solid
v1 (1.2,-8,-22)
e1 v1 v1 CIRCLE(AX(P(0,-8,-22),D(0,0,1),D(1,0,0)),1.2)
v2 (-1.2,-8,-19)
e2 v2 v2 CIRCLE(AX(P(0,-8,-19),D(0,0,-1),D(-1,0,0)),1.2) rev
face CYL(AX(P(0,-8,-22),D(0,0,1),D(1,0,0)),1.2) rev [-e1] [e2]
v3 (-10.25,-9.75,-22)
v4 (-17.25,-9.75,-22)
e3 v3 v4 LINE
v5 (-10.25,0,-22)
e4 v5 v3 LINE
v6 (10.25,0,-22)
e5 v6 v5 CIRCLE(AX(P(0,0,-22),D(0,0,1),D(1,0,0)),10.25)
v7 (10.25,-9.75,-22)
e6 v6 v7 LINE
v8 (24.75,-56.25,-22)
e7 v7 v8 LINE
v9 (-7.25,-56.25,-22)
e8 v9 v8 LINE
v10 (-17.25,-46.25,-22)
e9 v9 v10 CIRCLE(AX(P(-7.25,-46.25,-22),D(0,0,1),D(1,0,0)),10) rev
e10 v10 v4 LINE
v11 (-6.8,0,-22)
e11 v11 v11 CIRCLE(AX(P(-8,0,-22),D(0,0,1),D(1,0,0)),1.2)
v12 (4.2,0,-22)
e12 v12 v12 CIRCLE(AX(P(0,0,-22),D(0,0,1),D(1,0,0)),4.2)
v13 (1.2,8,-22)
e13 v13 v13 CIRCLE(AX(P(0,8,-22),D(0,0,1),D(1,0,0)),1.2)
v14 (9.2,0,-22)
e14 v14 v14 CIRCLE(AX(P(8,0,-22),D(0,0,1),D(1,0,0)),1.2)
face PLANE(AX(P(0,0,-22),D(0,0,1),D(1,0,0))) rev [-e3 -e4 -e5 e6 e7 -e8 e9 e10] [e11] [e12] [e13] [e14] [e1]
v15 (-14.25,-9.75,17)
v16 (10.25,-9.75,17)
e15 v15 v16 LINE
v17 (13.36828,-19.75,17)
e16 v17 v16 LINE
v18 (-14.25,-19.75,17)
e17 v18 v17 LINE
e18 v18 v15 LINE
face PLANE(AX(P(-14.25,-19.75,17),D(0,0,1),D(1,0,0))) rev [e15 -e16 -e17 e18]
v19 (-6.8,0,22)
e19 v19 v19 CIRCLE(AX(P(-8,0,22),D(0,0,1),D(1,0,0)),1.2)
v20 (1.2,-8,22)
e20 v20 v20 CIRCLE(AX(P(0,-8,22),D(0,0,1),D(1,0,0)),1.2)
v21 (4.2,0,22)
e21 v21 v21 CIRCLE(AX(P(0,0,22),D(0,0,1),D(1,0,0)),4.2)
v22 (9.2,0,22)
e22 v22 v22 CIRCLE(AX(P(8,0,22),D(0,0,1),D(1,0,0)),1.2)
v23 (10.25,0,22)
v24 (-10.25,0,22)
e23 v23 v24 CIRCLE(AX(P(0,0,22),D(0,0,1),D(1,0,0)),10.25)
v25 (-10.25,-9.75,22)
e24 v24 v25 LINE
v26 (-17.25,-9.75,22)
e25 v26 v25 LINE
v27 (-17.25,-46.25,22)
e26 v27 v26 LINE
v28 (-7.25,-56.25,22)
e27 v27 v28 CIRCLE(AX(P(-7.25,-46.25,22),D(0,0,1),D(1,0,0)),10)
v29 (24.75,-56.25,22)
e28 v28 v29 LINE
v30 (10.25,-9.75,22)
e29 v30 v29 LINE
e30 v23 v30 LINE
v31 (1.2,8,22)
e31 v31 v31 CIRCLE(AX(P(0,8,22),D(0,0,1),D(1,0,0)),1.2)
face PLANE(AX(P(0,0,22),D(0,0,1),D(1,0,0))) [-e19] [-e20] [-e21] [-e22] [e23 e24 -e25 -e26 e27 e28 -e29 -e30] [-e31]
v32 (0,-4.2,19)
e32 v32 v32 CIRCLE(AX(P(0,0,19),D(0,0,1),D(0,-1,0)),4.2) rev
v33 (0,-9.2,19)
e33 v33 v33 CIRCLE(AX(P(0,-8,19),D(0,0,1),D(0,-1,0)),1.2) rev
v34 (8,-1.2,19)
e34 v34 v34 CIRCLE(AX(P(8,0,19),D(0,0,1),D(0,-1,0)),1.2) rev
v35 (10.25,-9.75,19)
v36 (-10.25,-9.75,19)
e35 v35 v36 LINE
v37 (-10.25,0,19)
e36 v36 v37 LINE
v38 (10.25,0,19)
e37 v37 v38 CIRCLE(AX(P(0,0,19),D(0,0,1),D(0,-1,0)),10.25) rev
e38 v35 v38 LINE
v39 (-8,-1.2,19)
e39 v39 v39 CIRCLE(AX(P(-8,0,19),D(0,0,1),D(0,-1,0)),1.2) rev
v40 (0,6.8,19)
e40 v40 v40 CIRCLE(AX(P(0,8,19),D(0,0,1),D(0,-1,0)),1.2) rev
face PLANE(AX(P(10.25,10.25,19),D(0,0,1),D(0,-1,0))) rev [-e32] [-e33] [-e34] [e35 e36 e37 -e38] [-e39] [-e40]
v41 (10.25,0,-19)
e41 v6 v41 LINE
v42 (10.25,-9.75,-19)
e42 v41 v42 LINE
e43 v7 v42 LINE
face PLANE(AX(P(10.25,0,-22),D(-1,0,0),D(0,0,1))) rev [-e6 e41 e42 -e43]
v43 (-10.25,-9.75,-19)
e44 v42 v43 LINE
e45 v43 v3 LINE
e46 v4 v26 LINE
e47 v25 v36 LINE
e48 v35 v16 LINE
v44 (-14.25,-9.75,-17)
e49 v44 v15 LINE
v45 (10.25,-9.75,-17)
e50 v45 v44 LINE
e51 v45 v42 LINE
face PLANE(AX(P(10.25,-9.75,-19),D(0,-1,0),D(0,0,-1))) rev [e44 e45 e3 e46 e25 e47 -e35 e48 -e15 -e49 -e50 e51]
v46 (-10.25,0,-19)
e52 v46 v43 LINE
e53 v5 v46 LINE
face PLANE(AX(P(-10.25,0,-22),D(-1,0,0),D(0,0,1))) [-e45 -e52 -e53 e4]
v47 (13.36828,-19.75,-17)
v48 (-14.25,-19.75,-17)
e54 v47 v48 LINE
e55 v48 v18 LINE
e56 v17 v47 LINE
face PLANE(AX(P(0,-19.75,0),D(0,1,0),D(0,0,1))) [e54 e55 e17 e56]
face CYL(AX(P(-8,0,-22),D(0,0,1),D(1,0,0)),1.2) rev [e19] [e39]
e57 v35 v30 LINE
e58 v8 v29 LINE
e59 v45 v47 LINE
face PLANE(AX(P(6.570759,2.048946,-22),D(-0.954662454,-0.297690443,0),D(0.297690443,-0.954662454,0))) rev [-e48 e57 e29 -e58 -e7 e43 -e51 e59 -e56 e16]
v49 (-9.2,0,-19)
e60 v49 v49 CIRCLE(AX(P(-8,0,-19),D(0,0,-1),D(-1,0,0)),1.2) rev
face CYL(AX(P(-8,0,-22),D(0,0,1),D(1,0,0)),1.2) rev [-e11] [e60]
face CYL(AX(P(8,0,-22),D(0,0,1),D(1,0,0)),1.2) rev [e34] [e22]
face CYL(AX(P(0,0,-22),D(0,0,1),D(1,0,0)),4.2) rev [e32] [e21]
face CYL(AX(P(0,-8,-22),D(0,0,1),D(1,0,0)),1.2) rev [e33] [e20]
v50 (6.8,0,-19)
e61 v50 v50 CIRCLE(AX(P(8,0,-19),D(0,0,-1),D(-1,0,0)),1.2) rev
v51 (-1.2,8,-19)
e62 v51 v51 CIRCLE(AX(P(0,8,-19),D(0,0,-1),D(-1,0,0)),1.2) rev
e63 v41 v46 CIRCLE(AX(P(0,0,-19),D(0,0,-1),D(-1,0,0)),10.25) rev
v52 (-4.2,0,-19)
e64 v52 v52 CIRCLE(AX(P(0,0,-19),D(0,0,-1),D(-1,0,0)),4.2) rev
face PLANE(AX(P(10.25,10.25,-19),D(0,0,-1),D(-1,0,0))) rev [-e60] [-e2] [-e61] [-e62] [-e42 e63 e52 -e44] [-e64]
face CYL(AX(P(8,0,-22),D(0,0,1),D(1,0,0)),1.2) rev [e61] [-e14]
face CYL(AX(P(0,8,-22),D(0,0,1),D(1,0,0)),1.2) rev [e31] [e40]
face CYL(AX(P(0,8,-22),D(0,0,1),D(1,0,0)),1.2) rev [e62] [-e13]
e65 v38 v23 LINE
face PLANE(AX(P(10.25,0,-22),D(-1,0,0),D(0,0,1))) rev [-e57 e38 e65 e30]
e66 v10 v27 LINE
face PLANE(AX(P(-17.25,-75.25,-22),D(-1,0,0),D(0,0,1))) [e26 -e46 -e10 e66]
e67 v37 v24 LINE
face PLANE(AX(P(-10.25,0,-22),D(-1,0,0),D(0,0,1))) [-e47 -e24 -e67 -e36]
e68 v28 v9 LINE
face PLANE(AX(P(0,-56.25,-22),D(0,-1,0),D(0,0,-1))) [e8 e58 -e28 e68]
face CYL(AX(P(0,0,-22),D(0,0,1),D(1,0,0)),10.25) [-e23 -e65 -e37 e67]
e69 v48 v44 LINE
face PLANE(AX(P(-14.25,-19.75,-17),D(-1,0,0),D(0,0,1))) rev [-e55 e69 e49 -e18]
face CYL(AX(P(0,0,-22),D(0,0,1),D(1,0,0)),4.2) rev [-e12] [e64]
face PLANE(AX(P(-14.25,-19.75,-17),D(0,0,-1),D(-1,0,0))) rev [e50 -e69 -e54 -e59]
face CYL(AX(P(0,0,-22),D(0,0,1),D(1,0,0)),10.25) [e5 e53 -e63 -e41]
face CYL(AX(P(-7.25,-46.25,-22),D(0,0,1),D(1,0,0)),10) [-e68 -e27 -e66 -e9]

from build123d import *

# Parameters (mm, degrees)
BOSS_EXTRUDE1_DEPTH      = 22
BOSS_EXTRUDE1_DEPTH_BACK = 22
SKETCH2_W                = 38
SKETCH2_H                = 20
CUT_EXTRUDE1_DEPTH       = 105.423416914
SKETCH3_W                = 7
SKETCH3_H                = 44
BOSS_EXTRUDE2_DEPTH      = 65.5
SKETCH23_R               = 5
SKETCH23_R_2             = 1.2
CUT_EXTRUDE2_DEPTH       = 111.605436123
SKETCH24_W               = 28.5
SKETCH24_H               = 34
CUT_EXTRUDE3_DEPTH       = 90.954502389
SKETCH26_R               = 1.2
SKETCH26_R_2             = 5
SKETCH26_R_3             = 1.45
CUT_EXTRUDE6_DEPTH       = 107.330263801
SKETCH27_W               = 29.7
SKETCH27_H               = 35.2
CUT_EXTRUDE8_DEPTH       = 73.137455597
SKETCH29_W               = 7
SKETCH29_H               = 30
CUT_EXTRUDE10_DEPTH      = 74.468530678
CHAMFER2_SIZE            = 5
BOSS_EXTRUDE4_DEPTH      = 22
BOSS_EXTRUDE4_DEPTH_BACK = 22
SKETCH31_W               = 28.5
SKETCH31_H               = 34
CUT_EXTRUDE11_DEPTH      = 10
FILLET1_R                = 10


with BuildPart() as part:
    # Sketch1 → Boss-Extrude1 (new, two sides: drawn at the far end of the back side and taken through both)
    with BuildSketch(Plane.XY.offset(-BOSS_EXTRUDE1_DEPTH_BACK)):
        with BuildLine():
            Line((10.25, -60), (10.25, 0))
            ThreePointArc((10.25, 0), (0, -10.25), (-10.25, 0))
            Line((-10.25, 0), (-10.25, -60))
            Line((-10.25, -60), (-10.25, -100))
            Line((-10.25, -100), (10.25, -100))
            Line((10.25, -100), (10.25, -60))
        make_face()
        with BuildLine():
            Line((10.25, 0), (9.2, 0))
            ThreePointArc((9.2, 0), (8.816088231, -0.879772698), (7.91, -1.196620241))
            ThreePointArc((7.91, -1.196620241), (5.656854249, -5.656854249), (1.196620241, -7.91))
            ThreePointArc((1.196620241, -7.91), (1.199154762, -7.954968281), (1.2, -8))
            ThreePointArc((1.2, -8), (-0.045031719, -9.199154762), (-1.196620241, -7.91))
            ThreePointArc((-1.196620241, -7.91), (-5.656854249, -5.656854249), (-7.91, -1.196620241))
            ThreePointArc((-7.91, -1.196620241), (-8.816088231, -0.879772698), (-9.2, 0))
            Line((-9.2, 0), (-10.25, 0))
            ThreePointArc((-10.25, 0), (0, -10.25), (10.25, 0))
        make_face()
        with BuildLine():
            ThreePointArc((7.91, -1.196620241), (7.120227302, -0.816088231), (6.8, 0))
            Line((6.8, 0), (4.2, 0))
            ThreePointArc((4.2, 0), (0, -4.2), (-4.2, 0))
            Line((-4.2, 0), (-6.8, 0))
            ThreePointArc((-6.8, 0), (-7.120227302, -0.816088231), (-7.91, -1.196620241))
            ThreePointArc((-7.91, -1.196620241), (-5.656854249, -5.656854249), (-1.196620241, -7.91))
            ThreePointArc((-1.196620241, -7.91), (0, -6.8), (1.196620241, -7.91))
            ThreePointArc((1.196620241, -7.91), (5.656854249, -5.656854249), (7.91, -1.196620241))
        make_face()
        with BuildLine():
            Line((4.2, 0), (6.8, 0))
            ThreePointArc((6.8, 0), (7.120227302, 0.816088231), (7.91, 1.196620241))
            ThreePointArc((7.91, 1.196620241), (5.656854249, 5.656854249), (1.196620241, 7.91))
            ThreePointArc((1.196620241, 7.91), (0, 6.8), (-1.196620241, 7.91))
            ThreePointArc((-1.196620241, 7.91), (-5.656854249, 5.656854249), (-7.91, 1.196620241))
            ThreePointArc((-7.91, 1.196620241), (-7.120227302, 0.816088231), (-6.8, 0))
            Line((-6.8, 0), (-4.2, 0))
            ThreePointArc((-4.2, 0), (0, 4.2), (4.2, 0))
        make_face()
        with BuildLine():
            ThreePointArc((7.91, 1.196620241), (8.816088231, 0.879772698), (9.2, 0))
            Line((9.2, 0), (10.25, 0))
            ThreePointArc((10.25, 0), (0, 10.25), (-10.25, 0))
            Line((-10.25, 0), (-9.2, 0))
            ThreePointArc((-9.2, 0), (-8.816088231, 0.879772698), (-7.91, 1.196620241))
            ThreePointArc((-7.91, 1.196620241), (-5.656854249, 5.656854249), (-1.196620241, 7.91))
            ThreePointArc((-1.196620241, 7.91), (-0.045031719, 9.199154762), (1.2, 8))
            ThreePointArc((1.2, 8), (1.199154762, 7.954968281), (1.196620241, 7.91))
            ThreePointArc((1.196620241, 7.91), (5.656854249, 5.656854249), (7.91, 1.196620241))
        make_face()
    extrude(amount=BOSS_EXTRUDE1_DEPTH + BOSS_EXTRUDE1_DEPTH_BACK)

    # Sketch2 → Cut-Extrude1 (cut, through all)
    with BuildSketch(Plane.ZY.offset(10.25)):
        with Locations((0, 0.25)):
            Rectangle(SKETCH2_W, SKETCH2_H)
    extrude(amount=-CUT_EXTRUDE1_DEPTH, mode=Mode.SUBTRACT)

    # Sketch3 → Boss-Extrude2 (add)
    with BuildSketch(Plane(origin=(0, -9.75, 0), x_dir=(1, 0, 0), z_dir=(0, 1, 0))):
        with Locations((-13.75, 0)):
            Rectangle(SKETCH3_W, SKETCH3_H)
        with Locations((13.75, 0)):
            Rectangle(SKETCH3_W, SKETCH3_H)
    extrude(amount=-BOSS_EXTRUDE2_DEPTH)

    # Sketch23 → Cut-Extrude2 (cut, through all)
    with BuildSketch(Plane.XY.offset(22)):
        with BuildLine():
            Line((-10.25, -100), (10.25, -100))
            Line((10.25, -100), (10.25, -85))
            ThreePointArc((10.25, -85), (0, -95.25), (-10.25, -85))
            Line((-10.25, -85), (-10.25, -100))
        make_face()
        with Locations((0, -85)):
            Circle(SKETCH23_R)
        with Locations((8, -85)):
            Circle(SKETCH23_R_2)
        with Locations((0, -77)):
            Circle(SKETCH23_R_2)
        with Locations((0, -93)):
            Circle(SKETCH23_R_2)
        with Locations((-8, -85)):
            Circle(SKETCH23_R_2)
    extrude(amount=-CUT_EXTRUDE2_DEPTH, mode=Mode.SUBTRACT)

    # Sketch24 → Cut-Extrude3 (cut, through all)
    with BuildSketch(Plane(origin=(0, -9.75, 0), x_dir=(1, 0, 0), z_dir=(0, 1, 0))):
        Rectangle(SKETCH24_W, SKETCH24_H)
    extrude(amount=-CUT_EXTRUDE3_DEPTH, mode=Mode.SUBTRACT)

    # Sketch26 → Cut-Extrude6 (cut, through all)
    # profile 1 of 5: a face of its own
    with BuildSketch(Plane.XY.offset(22)):
        with BuildLine():
            Line((10.25, -75.25), (14.25, -75.25))
            Line((14.25, -75.25), (14.25, -56.53282359))
            Line((14.25, -56.53282359), (14.25, -56.25))
            Line((14.25, -56.25), (-14.25, -56.25))
            Line((-14.25, -56.25), (-14.25, -56.53282359))
            Line((-14.25, -56.53282359), (-14.25, -75.25))
            Line((-14.25, -75.25), (-10.25, -75.25))
            Line((-10.25, -75.25), (-10.25, -85))
            ThreePointArc((-10.25, -85), (0, -95.25), (10.25, -85))
            Line((10.25, -85), (10.25, -75.25))
        make_face()
        with Locations((-8, -85)):
            Circle(SKETCH26_R, mode=Mode.SUBTRACT)
        with Locations((0, -85)):
            Circle(SKETCH26_R_2, mode=Mode.SUBTRACT)
        with Locations((0, -77)):
            Circle(SKETCH26_R, mode=Mode.SUBTRACT)
        with Locations((0, -93)):
            Circle(SKETCH26_R, mode=Mode.SUBTRACT)
        with Locations((8, -85)):
            Circle(SKETCH26_R, mode=Mode.SUBTRACT)
    # profile 2 of 5: a face of its own
    with BuildSketch(Plane.XY.offset(22)):
        Polygon((-17.25, -75.25), (-14.25, -75.25), (-14.25, -56.53282359), (-14.25, -56.25), (-17.25, -56.25), align=None)
    # profile 3 of 5: a face of its own
    with BuildSketch(Plane.XY.offset(22)):
        Polygon((14.25, -56.53282359), (14.25, -75.25), (17.25, -75.25), (17.25, -56.25), (14.25, -56.25), align=None)
    # profile 4 of 5: a face of its own
    with BuildSketch(Plane.XY.offset(22)):
        with Locations((-11, -53)):
            Circle(SKETCH26_R_3)
    # profile 5 of 5: a face of its own
    with BuildSketch(Plane.XY.offset(22)):
        with Locations((11, -53)):
            Circle(SKETCH26_R_3)
    extrude(amount=-CUT_EXTRUDE6_DEPTH, mode=Mode.SUBTRACT)

    # Sketch27 → Cut-Extrude8 (cut, through all)
    with BuildSketch(Plane.XZ.offset(56.25)):
        Rectangle(SKETCH27_W, SKETCH27_H)
    extrude(amount=-CUT_EXTRUDE8_DEPTH, mode=Mode.SUBTRACT)

    # Sketch29 → Cut-Extrude10 (cut, through all)
    with BuildSketch(Plane(origin=(0, 0, -22), x_dir=(-1, 0, 0), z_dir=(0, 0, -1))):
        with Locations((-13.75, -24.75)):
            Rectangle(SKETCH29_W, SKETCH29_H)
    extrude(amount=-CUT_EXTRUDE10_DEPTH, mode=Mode.SUBTRACT)

    # Chamfer2
    # the kernel refuses this chamfer: 5 mm, written as the material it takes off along each edge
    with BuildSketch(Plane(origin=(-17.25, -56.25, 34.85841494), x_dir=(0.9996219169112968, -0.027495876610586327, 0), z_dir=(0, 0, -1))) as chamfer2_piece_1:
        Polygon((CHAMFER2_SIZE * 0.999621916911, -CHAMFER2_SIZE * 0.0274958766106), (-CHAMFER2_SIZE * 0.0274958766106, -CHAMFER2_SIZE * 0.999621916911), (0, 0), align=None)
    extrude(amount=69.71682988, mode=Mode.SUBTRACT)

    # Sketch30 → Boss-Extrude4 (add, two sides: drawn at the far end of the back side and taken through both)
    with BuildSketch(Plane.XY.offset(-BOSS_EXTRUDE4_DEPTH_BACK)):
        Polygon((24.75, -56.25), (17.25, -32.198275862), (17.25, -56.25), align=None)
        Polygon((17.25, -32.198275862), (10.25, -9.75), (-17.25, -9.75), (-17.25, -56.25), (17.25, -56.25), align=None)
    extrude(amount=BOSS_EXTRUDE4_DEPTH + BOSS_EXTRUDE4_DEPTH_BACK)

    # Sketch31 → Cut-Extrude11 (cut)
    with BuildSketch(Plane(origin=(0, -9.75, 0), x_dir=(1, 0, 0), z_dir=(0, 1, 0))):
        Rectangle(SKETCH31_W, SKETCH31_H)
    extrude(amount=-CUT_EXTRUDE11_DEPTH, mode=Mode.SUBTRACT)

    # Fillet1
    fillet1_edges = [part.edges().sort_by_distance(p)[0] for p in [
        (-17.25, -56.25, 0),
    ]]
    fillet(fillet1_edges, radius=FILLET1_R)


solid = part.part
